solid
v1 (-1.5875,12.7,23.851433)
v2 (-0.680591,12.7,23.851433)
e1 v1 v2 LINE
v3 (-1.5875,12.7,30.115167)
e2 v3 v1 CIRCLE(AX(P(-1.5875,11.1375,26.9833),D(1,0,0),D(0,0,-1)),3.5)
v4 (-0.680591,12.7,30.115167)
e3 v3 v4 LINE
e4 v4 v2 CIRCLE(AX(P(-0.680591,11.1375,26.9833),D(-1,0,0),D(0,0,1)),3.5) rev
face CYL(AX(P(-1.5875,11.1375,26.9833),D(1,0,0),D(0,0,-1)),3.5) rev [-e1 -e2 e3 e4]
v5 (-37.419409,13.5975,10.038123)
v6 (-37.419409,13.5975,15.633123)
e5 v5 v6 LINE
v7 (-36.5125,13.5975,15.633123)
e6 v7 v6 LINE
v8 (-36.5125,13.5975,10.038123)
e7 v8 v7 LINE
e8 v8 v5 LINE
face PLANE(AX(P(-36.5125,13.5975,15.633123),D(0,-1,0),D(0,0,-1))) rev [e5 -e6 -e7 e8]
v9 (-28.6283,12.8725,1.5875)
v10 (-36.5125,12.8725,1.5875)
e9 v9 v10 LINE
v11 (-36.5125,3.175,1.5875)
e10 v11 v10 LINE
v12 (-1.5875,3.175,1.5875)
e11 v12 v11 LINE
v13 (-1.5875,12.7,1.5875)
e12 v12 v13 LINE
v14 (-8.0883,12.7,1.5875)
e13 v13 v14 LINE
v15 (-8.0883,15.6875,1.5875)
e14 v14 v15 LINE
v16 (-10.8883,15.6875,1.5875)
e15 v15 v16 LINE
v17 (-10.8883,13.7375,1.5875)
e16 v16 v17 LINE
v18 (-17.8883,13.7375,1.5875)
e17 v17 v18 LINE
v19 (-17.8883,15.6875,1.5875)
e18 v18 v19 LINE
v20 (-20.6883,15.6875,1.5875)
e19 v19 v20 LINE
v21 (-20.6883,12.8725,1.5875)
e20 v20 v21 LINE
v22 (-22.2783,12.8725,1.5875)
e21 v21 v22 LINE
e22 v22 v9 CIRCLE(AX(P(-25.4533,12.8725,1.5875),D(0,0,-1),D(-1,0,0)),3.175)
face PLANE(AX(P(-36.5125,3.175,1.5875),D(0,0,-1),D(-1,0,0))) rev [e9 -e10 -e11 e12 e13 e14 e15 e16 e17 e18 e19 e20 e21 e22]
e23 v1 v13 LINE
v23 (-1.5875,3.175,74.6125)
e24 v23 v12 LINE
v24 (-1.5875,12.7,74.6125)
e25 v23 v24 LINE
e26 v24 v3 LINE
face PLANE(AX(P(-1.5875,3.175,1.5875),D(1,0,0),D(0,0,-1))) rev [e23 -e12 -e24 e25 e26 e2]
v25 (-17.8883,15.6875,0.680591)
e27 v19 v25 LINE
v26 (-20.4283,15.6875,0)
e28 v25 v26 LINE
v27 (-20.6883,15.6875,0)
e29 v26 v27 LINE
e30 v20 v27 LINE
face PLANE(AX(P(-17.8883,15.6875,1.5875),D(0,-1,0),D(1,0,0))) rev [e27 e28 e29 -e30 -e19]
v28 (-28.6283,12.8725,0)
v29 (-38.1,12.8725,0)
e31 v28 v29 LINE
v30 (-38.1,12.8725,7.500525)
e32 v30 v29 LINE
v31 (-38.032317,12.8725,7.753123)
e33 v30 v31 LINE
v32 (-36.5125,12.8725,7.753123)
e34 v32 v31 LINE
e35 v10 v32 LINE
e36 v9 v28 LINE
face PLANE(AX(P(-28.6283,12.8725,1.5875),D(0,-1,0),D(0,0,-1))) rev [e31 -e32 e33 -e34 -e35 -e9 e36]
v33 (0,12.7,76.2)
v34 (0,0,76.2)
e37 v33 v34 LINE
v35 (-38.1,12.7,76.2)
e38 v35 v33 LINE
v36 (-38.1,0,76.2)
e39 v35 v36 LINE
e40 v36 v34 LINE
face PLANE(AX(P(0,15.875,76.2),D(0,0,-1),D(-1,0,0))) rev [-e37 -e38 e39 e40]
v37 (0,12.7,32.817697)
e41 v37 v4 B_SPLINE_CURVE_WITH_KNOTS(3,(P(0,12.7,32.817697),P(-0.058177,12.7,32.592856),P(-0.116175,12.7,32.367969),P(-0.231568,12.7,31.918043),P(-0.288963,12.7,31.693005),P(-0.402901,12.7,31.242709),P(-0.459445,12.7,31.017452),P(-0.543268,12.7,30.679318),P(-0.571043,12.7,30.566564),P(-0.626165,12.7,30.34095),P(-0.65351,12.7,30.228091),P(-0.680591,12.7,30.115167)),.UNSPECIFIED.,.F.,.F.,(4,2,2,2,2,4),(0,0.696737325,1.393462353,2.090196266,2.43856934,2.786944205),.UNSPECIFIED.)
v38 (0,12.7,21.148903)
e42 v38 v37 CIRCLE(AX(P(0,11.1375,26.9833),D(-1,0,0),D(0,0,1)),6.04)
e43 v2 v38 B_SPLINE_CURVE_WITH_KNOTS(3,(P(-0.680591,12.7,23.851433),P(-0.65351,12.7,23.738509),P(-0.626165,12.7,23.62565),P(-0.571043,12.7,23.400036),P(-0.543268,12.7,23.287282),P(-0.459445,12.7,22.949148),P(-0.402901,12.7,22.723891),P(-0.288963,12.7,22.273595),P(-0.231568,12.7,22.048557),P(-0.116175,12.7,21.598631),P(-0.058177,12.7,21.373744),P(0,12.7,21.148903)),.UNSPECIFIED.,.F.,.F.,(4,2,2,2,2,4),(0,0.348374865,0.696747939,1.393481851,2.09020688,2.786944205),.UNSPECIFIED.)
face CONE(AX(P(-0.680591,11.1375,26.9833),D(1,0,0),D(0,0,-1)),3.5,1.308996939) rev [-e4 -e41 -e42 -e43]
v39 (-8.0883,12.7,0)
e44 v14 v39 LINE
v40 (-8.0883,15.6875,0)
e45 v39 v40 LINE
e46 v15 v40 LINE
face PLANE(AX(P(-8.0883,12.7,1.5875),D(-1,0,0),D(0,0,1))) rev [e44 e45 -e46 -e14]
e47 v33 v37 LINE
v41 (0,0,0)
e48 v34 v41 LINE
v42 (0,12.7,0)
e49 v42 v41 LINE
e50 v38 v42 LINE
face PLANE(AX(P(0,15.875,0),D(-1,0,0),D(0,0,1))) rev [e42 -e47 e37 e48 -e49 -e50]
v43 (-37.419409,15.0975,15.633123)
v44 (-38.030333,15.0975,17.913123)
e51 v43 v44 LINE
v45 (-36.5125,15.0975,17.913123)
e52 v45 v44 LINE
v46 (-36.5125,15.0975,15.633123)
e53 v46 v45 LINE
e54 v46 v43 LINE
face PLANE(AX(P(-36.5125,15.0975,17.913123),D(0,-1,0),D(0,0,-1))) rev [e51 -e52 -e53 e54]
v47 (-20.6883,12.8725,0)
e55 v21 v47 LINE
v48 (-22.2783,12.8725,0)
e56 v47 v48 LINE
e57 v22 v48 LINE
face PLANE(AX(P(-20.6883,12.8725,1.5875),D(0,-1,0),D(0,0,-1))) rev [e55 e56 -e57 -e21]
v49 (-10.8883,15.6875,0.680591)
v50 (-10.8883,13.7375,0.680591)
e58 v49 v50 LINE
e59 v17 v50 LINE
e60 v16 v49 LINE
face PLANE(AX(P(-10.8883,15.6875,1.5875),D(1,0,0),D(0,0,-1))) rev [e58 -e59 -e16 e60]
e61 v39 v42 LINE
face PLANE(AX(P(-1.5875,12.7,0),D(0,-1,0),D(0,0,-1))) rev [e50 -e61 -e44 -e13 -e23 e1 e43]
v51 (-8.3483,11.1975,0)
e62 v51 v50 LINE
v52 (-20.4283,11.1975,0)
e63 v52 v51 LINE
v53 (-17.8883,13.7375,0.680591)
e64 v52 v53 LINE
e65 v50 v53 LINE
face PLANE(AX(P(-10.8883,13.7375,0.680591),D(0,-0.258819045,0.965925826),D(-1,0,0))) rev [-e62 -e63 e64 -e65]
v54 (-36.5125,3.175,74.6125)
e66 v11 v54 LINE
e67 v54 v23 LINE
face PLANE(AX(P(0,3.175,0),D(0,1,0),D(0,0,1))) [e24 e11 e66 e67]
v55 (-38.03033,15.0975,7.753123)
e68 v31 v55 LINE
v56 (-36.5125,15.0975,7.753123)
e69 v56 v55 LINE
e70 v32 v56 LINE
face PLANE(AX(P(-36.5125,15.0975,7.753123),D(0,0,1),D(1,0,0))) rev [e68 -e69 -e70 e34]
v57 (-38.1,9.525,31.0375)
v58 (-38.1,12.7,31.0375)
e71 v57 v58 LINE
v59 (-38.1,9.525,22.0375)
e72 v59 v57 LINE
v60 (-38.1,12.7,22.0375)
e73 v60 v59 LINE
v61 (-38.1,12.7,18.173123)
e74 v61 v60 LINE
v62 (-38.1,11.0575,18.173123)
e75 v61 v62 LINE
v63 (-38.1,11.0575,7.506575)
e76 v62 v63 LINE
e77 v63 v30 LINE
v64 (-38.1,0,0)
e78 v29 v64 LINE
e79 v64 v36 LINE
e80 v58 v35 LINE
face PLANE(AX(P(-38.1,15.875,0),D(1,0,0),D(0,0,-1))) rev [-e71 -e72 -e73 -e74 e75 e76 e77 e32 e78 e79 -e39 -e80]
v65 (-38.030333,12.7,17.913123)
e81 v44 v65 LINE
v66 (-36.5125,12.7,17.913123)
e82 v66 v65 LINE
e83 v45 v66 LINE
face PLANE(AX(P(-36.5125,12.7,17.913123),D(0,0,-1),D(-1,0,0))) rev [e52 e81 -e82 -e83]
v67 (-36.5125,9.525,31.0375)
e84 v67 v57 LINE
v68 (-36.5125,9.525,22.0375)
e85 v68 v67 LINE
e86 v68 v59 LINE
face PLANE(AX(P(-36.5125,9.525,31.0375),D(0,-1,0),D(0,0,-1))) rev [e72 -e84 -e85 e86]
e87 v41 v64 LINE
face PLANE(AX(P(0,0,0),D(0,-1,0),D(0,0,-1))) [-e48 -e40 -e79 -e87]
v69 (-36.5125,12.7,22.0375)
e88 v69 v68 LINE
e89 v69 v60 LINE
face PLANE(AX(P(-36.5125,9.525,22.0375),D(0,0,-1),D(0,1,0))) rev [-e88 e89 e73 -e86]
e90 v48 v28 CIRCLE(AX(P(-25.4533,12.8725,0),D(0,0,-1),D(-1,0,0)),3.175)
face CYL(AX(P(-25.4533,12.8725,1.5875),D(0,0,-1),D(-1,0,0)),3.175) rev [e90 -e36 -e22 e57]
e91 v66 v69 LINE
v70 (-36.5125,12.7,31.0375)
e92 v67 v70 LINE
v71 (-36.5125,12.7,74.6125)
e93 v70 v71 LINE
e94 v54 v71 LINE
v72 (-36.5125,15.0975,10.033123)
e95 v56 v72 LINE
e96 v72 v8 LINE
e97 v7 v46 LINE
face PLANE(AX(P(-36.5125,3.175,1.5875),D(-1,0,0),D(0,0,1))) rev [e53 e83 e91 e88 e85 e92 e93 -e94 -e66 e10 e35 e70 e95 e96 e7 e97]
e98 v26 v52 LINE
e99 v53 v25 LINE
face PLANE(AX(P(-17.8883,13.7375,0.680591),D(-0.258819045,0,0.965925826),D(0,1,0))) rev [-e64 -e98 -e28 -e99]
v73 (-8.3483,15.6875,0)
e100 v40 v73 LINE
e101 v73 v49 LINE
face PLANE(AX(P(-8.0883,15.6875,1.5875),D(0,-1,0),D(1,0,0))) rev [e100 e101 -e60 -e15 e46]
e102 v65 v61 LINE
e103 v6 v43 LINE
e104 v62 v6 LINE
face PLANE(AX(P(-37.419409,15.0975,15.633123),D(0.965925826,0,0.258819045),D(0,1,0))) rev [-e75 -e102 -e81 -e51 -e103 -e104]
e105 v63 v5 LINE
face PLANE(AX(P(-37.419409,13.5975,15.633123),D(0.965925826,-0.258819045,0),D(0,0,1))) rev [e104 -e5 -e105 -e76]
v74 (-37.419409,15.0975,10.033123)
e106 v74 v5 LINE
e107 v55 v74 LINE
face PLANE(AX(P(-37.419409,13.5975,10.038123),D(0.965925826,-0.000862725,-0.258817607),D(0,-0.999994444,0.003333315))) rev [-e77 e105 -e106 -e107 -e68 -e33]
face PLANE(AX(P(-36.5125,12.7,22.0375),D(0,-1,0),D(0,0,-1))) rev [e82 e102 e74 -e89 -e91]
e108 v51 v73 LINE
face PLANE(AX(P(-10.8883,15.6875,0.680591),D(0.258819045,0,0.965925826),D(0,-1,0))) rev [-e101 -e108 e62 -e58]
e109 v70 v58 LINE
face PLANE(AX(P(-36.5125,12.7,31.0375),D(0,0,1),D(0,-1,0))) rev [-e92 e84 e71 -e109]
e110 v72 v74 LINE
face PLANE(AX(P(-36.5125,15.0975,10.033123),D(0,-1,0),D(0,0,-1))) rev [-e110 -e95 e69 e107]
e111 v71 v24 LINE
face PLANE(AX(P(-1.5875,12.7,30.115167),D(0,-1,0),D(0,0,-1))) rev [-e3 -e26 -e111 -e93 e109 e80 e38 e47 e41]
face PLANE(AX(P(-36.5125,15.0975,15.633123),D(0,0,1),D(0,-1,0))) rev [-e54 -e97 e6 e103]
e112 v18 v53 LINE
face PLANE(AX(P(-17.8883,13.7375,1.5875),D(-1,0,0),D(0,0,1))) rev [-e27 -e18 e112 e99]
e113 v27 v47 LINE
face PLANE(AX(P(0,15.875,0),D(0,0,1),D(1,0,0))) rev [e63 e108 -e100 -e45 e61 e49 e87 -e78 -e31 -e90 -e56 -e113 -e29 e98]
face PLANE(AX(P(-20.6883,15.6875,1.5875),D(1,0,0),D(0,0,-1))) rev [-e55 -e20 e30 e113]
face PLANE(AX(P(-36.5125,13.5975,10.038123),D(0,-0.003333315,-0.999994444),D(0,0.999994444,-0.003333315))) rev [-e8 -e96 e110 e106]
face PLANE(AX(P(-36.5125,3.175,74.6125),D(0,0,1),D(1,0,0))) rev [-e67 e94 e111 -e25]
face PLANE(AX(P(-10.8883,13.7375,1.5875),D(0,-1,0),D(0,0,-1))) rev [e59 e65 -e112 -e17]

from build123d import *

# Parameters (mm, degrees)
SKETCH1_W           = 38.1
SKETCH1_H           = 76.2
BOSS_EXTRUDE1_DEPTH = 15.875
SKETCH4_W           = 34.925
SKETCH4_H           = 73.025
CUT_EXTRUDE2_DEPTH  = 12.7
CUT_EXTRUDE3_DEPTH  = 1.5875
CHAMFER1_SIZE       = 2.54
CHAMFER1_SIZE2      = 0.680590949
CUT_EXTRUDE4_DEPTH  = 1.5875
CHAMFER2_SIZE       = 2.54
CHAMFER2_SIZE2      = 0.680590949
SKETCH7_W           = 34.925
SKETCH7_H           = 3.175
CUT_EXTRUDE5_DEPTH  = 1.5875
CUT_EXTRUDE6_DEPTH  = 1.5875


with BuildPart() as part:
    # Sketch1 → Boss-Extrude1 (new body)
    with BuildSketch(Plane(origin=(0, 0, 0), x_dir=(1, 0, 0), z_dir=(0, 1, 0))):
        with Locations((-19.05, -38.1)):
            Rectangle(SKETCH1_W, SKETCH1_H)
    extrude(amount=BOSS_EXTRUDE1_DEPTH)

    # Sketch4 → Cut-Extrude2 (cut)
    with BuildSketch(Plane(origin=(0, 15.875, 0), x_dir=(1, 0, 0), z_dir=(0, 1, 0))):
        with Locations((-19.05, -38.1)):
            Rectangle(SKETCH4_W, SKETCH4_H)
    extrude(amount=-CUT_EXTRUDE2_DEPTH, mode=Mode.SUBTRACT)

    # Sketch5 → Cut-Extrude3 (cut)
    with BuildSketch(Plane(origin=(0, 0, 0), x_dir=(0, 0, -1), z_dir=(1, 0, 0))):
        with BuildLine():
            Line((0, 12.7), (-23.851432546, 12.7))
            ThreePointArc((-23.851432546, 12.7), (-26.9833, 7.6375), (-30.115167454, 12.7))
            Line((-30.115167454, 12.7), (-76.2, 12.7))
            Line((-76.2, 12.7), (-76.2, 15.875))
            Line((-76.2, 15.875), (0, 15.875))
            Line((0, 15.875), (0, 12.7))
        make_face()
    extrude(amount=-CUT_EXTRUDE3_DEPTH, mode=Mode.SUBTRACT)

    # Chamfer1
    chamfer1_edges = [part.edges().sort_by_distance(p)[0] for p in [
        (0, 7.6375, 26.9833),
    ]]
    chamfer1_side = [part.faces().sort_by_distance(p)[0] for p in [
        (0, 6.21970244, 38.453254935),
    ]]
    chamfer(chamfer1_edges, length=CHAMFER1_SIZE, length2=CHAMFER1_SIZE2, reference=chamfer1_side[0])

    # Sketch6 → Cut-Extrude4 (cut)
    with BuildSketch(Plane(origin=(0, 0, 0), x_dir=(-1, 0, 0), z_dir=(0, 0, -1))):
        with BuildLine():
            Line((1.5875, 12.7), (8.0883, 12.7))
            Line((8.0883, 12.7), (8.0883, 15.6875))
            Line((8.0883, 15.6875), (10.8883, 15.6875))
            Line((10.8883, 15.6875), (10.8883, 13.7375))
            Line((10.8883, 13.7375), (17.8883, 13.7375))
            Line((17.8883, 13.7375), (17.8883, 15.6875))
            Line((17.8883, 15.6875), (20.6883, 15.6875))
            Line((20.6883, 15.6875), (20.6883, 12.8725))
            Line((20.6883, 12.8725), (22.2783, 12.8725))
            ThreePointArc((22.2783, 12.8725), (25.4533, 9.6975), (28.6283, 12.8725))
            Line((28.6283, 12.8725), (38.1, 12.8725))
            Line((38.1, 12.8725), (38.1, 15.875))
            Line((38.1, 15.875), (1.5875, 15.875))
            Line((1.5875, 15.875), (1.5875, 12.7))
        make_face()
    extrude(amount=-CUT_EXTRUDE4_DEPTH, mode=Mode.SUBTRACT)

    # Chamfer2
    chamfer2_edges = [part.edges().sort_by_distance(p)[0] for p in [
        (-10.8883, 14.7125, 0),
        (-14.3883, 13.7375, 0),
        (-17.8883, 14.7125, 0),
    ]]
    chamfer2_side = [part.faces().sort_by_distance(p)[0] for p in [
        (-18.682001646, 6.589374137, 0),
    ]]
    chamfer(chamfer2_edges, length=CHAMFER2_SIZE, length2=CHAMFER2_SIZE2, reference=chamfer2_side[0])

    # Sketch7 → Cut-Extrude5 (cut)
    with BuildSketch(Plane.XY.offset(76.2)):
        with Locations((-19.05, 14.2875)):
            Rectangle(SKETCH7_W, SKETCH7_H)
    extrude(amount=-CUT_EXTRUDE5_DEPTH, mode=Mode.SUBTRACT)

    # Sketch8 → Cut-Extrude6 (cut)
    with BuildSketch(Plane.ZY.offset(38.1)):
        Polygon((76.2, 12.7), (31.0375, 12.7), (31.0375, 9.525), (22.0375, 9.525), (22.0375, 12.7), (17.913122854, 12.7), (17.913122854, 15.0975), (15.633122854, 15.0975), (15.633122854, 13.5975), (10.038122854, 13.5975), (10.033122854, 15.0975), (7.753122854, 15.0975), (7.753122854, 12.8725), (1.5875, 12.8725), (1.5875, 15.875), (76.2, 15.875), align=None)
    extrude(amount=-CUT_EXTRUDE6_DEPTH, mode=Mode.SUBTRACT)

    # Chamfer3
    # the kernel refuses this chamfer: 2.54, 0.680590949 mm, written as the material it takes off along each edge
    with BuildSketch(Plane(origin=(-38.1, 7.001863854, 10.060108308), x_dir=(-0.009967146577155543, -0.003333149238426835, -0.9999447715275398), z_dir=(0, 0.9999944444907404, -0.003333314814970836))) as chamfer3_piece_1_section:
        with BuildLine():
            Line((2.638269115, 0), (-0.105178835, -0.705873694))
            Line((-0.105178835, -0.705873694), (-0.155976312, -0.705367363))
            ThreePointArc((-0.155976312, -0.705367363), (-0.0543203, -0.352919594), (-0.050797477, 0.000506331))
            Line((-0.050797477, 0.000506331), (0.000506331, 0.050797477))
            ThreePointArc((0.000506331, 0.050797477), (1.319509841, 0.037650122), (2.638775446, 0.050797477))
            Line((2.638775446, 0.050797477), (2.638269115, 0))
        make_face()
    chamfer3_piece_1 = extrude(amount=14.69135391, mode=Mode.PRIVATE)
    chamfer3_piece_1 = split(chamfer3_piece_1, bisect_by=Plane(origin=(-37.899401738, 15.0975, 9.151337031), z_dir=(0, -1, 0)), keep=Keep.TOP, mode=Mode.PRIVATE)
    chamfer3_piece_1 = split(chamfer3_piece_1, bisect_by=Plane(origin=(-37.899401738, 13.5975, 9.151337031), z_dir=(0, 1, 0)), keep=Keep.TOP, mode=Mode.PRIVATE)
    add(chamfer3_piece_1, mode=Mode.SUBTRACT)
    with BuildSketch(Plane(origin=(-38.1, 13.5975, 15.633122854), x_dir=(-0.009967146577155547, -0.9999503267608394, 0), z_dir=(0, 0, -1))) as chamfer3_piece_2_section:
        with BuildLine():
            Line((2.638269115, 0), (-0.105178835, -0.705873694))
            Line((-0.105178835, -0.705873694), (-0.155976312, -0.705367363))
            ThreePointArc((-0.155976312, -0.705367363), (-0.0543203, -0.352919594), (-0.050797477, 0.000506331))
            Line((-0.050797477, 0.000506331), (0.000506331, 0.050797477))
            ThreePointArc((0.000506331, 0.050797477), (1.319509841, 0.037650122), (2.638775446, 0.050797477))
            Line((2.638775446, 0.050797477), (2.638269115, 0))
        make_face()
    chamfer3_piece_2 = extrude(amount=12.190672788, mode=Mode.PRIVATE)
    chamfer3_piece_2 = split(chamfer3_piece_2, bisect_by=Plane(origin=(-37.899362184, 12.704169113, 10.041100623), z_dir=(0, 0.003333314814970836, 0.9999944444907404)), keep=Keep.TOP, mode=Mode.PRIVATE)
    add(chamfer3_piece_2, mode=Mode.SUBTRACT)
    with BuildSketch(Plane(origin=(-38.1, 15.0975, 15.633122854), x_dir=(-0.009967146577155547, -2.3683581360028347e-15, 0.9999503267608394), z_dir=(0, -1, 0))) as chamfer3_piece_3:
        with BuildLine():
            Line((2.638269115, 0), (-0.105178835, -0.705873694))
            Line((-0.105178835, -0.705873694), (-0.155976312, -0.705367363))
            ThreePointArc((-0.155976312, -0.705367363), (-0.0543203, -0.352919594), (-0.050797477, 0.000506331))
            Line((-0.050797477, 0.000506331), (0.000506331, 0.050797477))
            ThreePointArc((0.000506331, 0.050797477), (1.319509841, 0.037650122), (2.638775446, 0.050797477))
            Line((2.638775446, 0.050797477), (2.638269115, 0))
        make_face()
    extrude(amount=1.5, mode=Mode.SUBTRACT)
    with BuildSketch(Plane(origin=(-38.1, 7.001863854, 10.060108308), x_dir=(-0.009967146577155543, -0.003333149238426835, -0.9999447715275398), z_dir=(0, 0.9999944444907404, -0.003333314814970836))) as chamfer3_piece_4a_section:
        with BuildLine():
            Line((2.638269115, 0), (-0.105178835, -0.705873694))
            Line((-0.105178835, -0.705873694), (-0.155976312, -0.705367363))
            ThreePointArc((-0.155976312, -0.705367363), (-0.0543203, -0.352919594), (-0.050797477, 0.000506331))
            Line((-0.050797477, 0.000506331), (0.000506331, 0.050797477))
            ThreePointArc((0.000506331, 0.050797477), (1.319509841, 0.037650122), (2.638775446, 0.050797477))
            Line((2.638775446, 0.050797477), (2.638269115, 0))
        make_face()
    chamfer3_piece_4a = extrude(amount=14.69135391, mode=Mode.PRIVATE)
    chamfer3_piece_4a = split(chamfer3_piece_4a, bisect_by=Plane(origin=(-37.899435258, 13.5975, 9.16460585), z_dir=(0, -1, 0)), keep=Keep.TOP, mode=Mode.PRIVATE)
    with BuildSketch(Plane(origin=(-38.1, 13.5975, 15.633122854), x_dir=(-0.009967146577155547, -0.9999503267608394, 0), z_dir=(0, 0, -1))) as chamfer3_piece_4b_section:
        with BuildLine():
            Line((2.638269115, 0), (-0.105178835, -0.705873694))
            Line((-0.105178835, -0.705873694), (-0.155976312, -0.705367363))
            ThreePointArc((-0.155976312, -0.705367363), (-0.0543203, -0.352919594), (-0.050797477, 0.000506331))
            Line((-0.050797477, 0.000506331), (0.000506331, 0.050797477))
            ThreePointArc((0.000506331, 0.050797477), (1.319509841, 0.037650122), (2.638775446, 0.050797477))
            Line((2.638775446, 0.050797477), (2.638269115, 0))
        make_face()
    chamfer3_piece_4b = extrude(amount=12.190672788, mode=Mode.PRIVATE)
    chamfer3_piece_4b = split(chamfer3_piece_4b, bisect_by=Plane(origin=(-37.899435258, 12.723987849, 10.041034561), z_dir=(0, -0.003333314814970836, -0.9999944444907404)), keep=Keep.TOP, mode=Mode.PRIVATE)
    chamfer3_piece_4 = chamfer3_piece_4a & chamfer3_piece_4b
    add(chamfer3_piece_4, mode=Mode.SUBTRACT)
    with BuildSketch(Plane(origin=(-38.1, 13.5975, 22.228795642), x_dir=(-0.00996714657715554, -0.9999503267608394, 0), z_dir=(0, 0, -1))) as chamfer3_piece_5a_section:
        with BuildLine():
            Line((2.638269115, 0), (-0.105178835, -0.705873694))
            Line((-0.105178835, -0.705873694), (-0.155976312, -0.705367363))
            ThreePointArc((-0.155976312, -0.705367363), (-0.0543203, -0.352919594), (-0.050797477, 0.000506331))
            Line((-0.050797477, 0.000506331), (0.000506331, 0.050797477))
            ThreePointArc((0.000506331, 0.050797477), (1.319509841, 0.037650122), (2.638775446, 0.050797477))
            Line((2.638775446, 0.050797477), (2.638269115, 0))
        make_face()
    chamfer3_piece_5a = extrude(amount=18.786345577, mode=Mode.PRIVATE)
    chamfer3_piece_5a = split(chamfer3_piece_5a, bisect_by=Plane(origin=(-37.899401738, 12.71321909, 15.633122854), z_dir=(0, 0, 1)), keep=Keep.TOP, mode=Mode.PRIVATE)
    with BuildSketch(Plane(origin=(-38.1, 15.0975, 15.633122854), x_dir=(-0.009967146577155547, -2.3683581360028347e-15, 0.9999503267608394), z_dir=(0, -1, 0))) as chamfer3_piece_5b_section:
        with BuildLine():
            Line((2.638269115, 0), (-0.105178835, -0.705873694))
            Line((-0.105178835, -0.705873694), (-0.155976312, -0.705367363))
            ThreePointArc((-0.155976312, -0.705367363), (-0.0543203, -0.352919594), (-0.050797477, 0.000506331))
            Line((-0.050797477, 0.000506331), (0.000506331, 0.050797477))
            ThreePointArc((0.000506331, 0.050797477), (1.319509841, 0.037650122), (2.638775446, 0.050797477))
            Line((2.638775446, 0.050797477), (2.638269115, 0))
        make_face()
    chamfer3_piece_5b = extrude(amount=8.095672788, mode=Mode.PRIVATE)
    chamfer3_piece_5b = split(chamfer3_piece_5b, bisect_by=Plane(origin=(-37.899401738, 13.5975, 16.517403764), z_dir=(0, -1, 0)), keep=Keep.TOP, mode=Mode.PRIVATE)
    chamfer3_piece_5 = chamfer3_piece_5a & chamfer3_piece_5b
    add(chamfer3_piece_5, mode=Mode.SUBTRACT)


solid = part.part
